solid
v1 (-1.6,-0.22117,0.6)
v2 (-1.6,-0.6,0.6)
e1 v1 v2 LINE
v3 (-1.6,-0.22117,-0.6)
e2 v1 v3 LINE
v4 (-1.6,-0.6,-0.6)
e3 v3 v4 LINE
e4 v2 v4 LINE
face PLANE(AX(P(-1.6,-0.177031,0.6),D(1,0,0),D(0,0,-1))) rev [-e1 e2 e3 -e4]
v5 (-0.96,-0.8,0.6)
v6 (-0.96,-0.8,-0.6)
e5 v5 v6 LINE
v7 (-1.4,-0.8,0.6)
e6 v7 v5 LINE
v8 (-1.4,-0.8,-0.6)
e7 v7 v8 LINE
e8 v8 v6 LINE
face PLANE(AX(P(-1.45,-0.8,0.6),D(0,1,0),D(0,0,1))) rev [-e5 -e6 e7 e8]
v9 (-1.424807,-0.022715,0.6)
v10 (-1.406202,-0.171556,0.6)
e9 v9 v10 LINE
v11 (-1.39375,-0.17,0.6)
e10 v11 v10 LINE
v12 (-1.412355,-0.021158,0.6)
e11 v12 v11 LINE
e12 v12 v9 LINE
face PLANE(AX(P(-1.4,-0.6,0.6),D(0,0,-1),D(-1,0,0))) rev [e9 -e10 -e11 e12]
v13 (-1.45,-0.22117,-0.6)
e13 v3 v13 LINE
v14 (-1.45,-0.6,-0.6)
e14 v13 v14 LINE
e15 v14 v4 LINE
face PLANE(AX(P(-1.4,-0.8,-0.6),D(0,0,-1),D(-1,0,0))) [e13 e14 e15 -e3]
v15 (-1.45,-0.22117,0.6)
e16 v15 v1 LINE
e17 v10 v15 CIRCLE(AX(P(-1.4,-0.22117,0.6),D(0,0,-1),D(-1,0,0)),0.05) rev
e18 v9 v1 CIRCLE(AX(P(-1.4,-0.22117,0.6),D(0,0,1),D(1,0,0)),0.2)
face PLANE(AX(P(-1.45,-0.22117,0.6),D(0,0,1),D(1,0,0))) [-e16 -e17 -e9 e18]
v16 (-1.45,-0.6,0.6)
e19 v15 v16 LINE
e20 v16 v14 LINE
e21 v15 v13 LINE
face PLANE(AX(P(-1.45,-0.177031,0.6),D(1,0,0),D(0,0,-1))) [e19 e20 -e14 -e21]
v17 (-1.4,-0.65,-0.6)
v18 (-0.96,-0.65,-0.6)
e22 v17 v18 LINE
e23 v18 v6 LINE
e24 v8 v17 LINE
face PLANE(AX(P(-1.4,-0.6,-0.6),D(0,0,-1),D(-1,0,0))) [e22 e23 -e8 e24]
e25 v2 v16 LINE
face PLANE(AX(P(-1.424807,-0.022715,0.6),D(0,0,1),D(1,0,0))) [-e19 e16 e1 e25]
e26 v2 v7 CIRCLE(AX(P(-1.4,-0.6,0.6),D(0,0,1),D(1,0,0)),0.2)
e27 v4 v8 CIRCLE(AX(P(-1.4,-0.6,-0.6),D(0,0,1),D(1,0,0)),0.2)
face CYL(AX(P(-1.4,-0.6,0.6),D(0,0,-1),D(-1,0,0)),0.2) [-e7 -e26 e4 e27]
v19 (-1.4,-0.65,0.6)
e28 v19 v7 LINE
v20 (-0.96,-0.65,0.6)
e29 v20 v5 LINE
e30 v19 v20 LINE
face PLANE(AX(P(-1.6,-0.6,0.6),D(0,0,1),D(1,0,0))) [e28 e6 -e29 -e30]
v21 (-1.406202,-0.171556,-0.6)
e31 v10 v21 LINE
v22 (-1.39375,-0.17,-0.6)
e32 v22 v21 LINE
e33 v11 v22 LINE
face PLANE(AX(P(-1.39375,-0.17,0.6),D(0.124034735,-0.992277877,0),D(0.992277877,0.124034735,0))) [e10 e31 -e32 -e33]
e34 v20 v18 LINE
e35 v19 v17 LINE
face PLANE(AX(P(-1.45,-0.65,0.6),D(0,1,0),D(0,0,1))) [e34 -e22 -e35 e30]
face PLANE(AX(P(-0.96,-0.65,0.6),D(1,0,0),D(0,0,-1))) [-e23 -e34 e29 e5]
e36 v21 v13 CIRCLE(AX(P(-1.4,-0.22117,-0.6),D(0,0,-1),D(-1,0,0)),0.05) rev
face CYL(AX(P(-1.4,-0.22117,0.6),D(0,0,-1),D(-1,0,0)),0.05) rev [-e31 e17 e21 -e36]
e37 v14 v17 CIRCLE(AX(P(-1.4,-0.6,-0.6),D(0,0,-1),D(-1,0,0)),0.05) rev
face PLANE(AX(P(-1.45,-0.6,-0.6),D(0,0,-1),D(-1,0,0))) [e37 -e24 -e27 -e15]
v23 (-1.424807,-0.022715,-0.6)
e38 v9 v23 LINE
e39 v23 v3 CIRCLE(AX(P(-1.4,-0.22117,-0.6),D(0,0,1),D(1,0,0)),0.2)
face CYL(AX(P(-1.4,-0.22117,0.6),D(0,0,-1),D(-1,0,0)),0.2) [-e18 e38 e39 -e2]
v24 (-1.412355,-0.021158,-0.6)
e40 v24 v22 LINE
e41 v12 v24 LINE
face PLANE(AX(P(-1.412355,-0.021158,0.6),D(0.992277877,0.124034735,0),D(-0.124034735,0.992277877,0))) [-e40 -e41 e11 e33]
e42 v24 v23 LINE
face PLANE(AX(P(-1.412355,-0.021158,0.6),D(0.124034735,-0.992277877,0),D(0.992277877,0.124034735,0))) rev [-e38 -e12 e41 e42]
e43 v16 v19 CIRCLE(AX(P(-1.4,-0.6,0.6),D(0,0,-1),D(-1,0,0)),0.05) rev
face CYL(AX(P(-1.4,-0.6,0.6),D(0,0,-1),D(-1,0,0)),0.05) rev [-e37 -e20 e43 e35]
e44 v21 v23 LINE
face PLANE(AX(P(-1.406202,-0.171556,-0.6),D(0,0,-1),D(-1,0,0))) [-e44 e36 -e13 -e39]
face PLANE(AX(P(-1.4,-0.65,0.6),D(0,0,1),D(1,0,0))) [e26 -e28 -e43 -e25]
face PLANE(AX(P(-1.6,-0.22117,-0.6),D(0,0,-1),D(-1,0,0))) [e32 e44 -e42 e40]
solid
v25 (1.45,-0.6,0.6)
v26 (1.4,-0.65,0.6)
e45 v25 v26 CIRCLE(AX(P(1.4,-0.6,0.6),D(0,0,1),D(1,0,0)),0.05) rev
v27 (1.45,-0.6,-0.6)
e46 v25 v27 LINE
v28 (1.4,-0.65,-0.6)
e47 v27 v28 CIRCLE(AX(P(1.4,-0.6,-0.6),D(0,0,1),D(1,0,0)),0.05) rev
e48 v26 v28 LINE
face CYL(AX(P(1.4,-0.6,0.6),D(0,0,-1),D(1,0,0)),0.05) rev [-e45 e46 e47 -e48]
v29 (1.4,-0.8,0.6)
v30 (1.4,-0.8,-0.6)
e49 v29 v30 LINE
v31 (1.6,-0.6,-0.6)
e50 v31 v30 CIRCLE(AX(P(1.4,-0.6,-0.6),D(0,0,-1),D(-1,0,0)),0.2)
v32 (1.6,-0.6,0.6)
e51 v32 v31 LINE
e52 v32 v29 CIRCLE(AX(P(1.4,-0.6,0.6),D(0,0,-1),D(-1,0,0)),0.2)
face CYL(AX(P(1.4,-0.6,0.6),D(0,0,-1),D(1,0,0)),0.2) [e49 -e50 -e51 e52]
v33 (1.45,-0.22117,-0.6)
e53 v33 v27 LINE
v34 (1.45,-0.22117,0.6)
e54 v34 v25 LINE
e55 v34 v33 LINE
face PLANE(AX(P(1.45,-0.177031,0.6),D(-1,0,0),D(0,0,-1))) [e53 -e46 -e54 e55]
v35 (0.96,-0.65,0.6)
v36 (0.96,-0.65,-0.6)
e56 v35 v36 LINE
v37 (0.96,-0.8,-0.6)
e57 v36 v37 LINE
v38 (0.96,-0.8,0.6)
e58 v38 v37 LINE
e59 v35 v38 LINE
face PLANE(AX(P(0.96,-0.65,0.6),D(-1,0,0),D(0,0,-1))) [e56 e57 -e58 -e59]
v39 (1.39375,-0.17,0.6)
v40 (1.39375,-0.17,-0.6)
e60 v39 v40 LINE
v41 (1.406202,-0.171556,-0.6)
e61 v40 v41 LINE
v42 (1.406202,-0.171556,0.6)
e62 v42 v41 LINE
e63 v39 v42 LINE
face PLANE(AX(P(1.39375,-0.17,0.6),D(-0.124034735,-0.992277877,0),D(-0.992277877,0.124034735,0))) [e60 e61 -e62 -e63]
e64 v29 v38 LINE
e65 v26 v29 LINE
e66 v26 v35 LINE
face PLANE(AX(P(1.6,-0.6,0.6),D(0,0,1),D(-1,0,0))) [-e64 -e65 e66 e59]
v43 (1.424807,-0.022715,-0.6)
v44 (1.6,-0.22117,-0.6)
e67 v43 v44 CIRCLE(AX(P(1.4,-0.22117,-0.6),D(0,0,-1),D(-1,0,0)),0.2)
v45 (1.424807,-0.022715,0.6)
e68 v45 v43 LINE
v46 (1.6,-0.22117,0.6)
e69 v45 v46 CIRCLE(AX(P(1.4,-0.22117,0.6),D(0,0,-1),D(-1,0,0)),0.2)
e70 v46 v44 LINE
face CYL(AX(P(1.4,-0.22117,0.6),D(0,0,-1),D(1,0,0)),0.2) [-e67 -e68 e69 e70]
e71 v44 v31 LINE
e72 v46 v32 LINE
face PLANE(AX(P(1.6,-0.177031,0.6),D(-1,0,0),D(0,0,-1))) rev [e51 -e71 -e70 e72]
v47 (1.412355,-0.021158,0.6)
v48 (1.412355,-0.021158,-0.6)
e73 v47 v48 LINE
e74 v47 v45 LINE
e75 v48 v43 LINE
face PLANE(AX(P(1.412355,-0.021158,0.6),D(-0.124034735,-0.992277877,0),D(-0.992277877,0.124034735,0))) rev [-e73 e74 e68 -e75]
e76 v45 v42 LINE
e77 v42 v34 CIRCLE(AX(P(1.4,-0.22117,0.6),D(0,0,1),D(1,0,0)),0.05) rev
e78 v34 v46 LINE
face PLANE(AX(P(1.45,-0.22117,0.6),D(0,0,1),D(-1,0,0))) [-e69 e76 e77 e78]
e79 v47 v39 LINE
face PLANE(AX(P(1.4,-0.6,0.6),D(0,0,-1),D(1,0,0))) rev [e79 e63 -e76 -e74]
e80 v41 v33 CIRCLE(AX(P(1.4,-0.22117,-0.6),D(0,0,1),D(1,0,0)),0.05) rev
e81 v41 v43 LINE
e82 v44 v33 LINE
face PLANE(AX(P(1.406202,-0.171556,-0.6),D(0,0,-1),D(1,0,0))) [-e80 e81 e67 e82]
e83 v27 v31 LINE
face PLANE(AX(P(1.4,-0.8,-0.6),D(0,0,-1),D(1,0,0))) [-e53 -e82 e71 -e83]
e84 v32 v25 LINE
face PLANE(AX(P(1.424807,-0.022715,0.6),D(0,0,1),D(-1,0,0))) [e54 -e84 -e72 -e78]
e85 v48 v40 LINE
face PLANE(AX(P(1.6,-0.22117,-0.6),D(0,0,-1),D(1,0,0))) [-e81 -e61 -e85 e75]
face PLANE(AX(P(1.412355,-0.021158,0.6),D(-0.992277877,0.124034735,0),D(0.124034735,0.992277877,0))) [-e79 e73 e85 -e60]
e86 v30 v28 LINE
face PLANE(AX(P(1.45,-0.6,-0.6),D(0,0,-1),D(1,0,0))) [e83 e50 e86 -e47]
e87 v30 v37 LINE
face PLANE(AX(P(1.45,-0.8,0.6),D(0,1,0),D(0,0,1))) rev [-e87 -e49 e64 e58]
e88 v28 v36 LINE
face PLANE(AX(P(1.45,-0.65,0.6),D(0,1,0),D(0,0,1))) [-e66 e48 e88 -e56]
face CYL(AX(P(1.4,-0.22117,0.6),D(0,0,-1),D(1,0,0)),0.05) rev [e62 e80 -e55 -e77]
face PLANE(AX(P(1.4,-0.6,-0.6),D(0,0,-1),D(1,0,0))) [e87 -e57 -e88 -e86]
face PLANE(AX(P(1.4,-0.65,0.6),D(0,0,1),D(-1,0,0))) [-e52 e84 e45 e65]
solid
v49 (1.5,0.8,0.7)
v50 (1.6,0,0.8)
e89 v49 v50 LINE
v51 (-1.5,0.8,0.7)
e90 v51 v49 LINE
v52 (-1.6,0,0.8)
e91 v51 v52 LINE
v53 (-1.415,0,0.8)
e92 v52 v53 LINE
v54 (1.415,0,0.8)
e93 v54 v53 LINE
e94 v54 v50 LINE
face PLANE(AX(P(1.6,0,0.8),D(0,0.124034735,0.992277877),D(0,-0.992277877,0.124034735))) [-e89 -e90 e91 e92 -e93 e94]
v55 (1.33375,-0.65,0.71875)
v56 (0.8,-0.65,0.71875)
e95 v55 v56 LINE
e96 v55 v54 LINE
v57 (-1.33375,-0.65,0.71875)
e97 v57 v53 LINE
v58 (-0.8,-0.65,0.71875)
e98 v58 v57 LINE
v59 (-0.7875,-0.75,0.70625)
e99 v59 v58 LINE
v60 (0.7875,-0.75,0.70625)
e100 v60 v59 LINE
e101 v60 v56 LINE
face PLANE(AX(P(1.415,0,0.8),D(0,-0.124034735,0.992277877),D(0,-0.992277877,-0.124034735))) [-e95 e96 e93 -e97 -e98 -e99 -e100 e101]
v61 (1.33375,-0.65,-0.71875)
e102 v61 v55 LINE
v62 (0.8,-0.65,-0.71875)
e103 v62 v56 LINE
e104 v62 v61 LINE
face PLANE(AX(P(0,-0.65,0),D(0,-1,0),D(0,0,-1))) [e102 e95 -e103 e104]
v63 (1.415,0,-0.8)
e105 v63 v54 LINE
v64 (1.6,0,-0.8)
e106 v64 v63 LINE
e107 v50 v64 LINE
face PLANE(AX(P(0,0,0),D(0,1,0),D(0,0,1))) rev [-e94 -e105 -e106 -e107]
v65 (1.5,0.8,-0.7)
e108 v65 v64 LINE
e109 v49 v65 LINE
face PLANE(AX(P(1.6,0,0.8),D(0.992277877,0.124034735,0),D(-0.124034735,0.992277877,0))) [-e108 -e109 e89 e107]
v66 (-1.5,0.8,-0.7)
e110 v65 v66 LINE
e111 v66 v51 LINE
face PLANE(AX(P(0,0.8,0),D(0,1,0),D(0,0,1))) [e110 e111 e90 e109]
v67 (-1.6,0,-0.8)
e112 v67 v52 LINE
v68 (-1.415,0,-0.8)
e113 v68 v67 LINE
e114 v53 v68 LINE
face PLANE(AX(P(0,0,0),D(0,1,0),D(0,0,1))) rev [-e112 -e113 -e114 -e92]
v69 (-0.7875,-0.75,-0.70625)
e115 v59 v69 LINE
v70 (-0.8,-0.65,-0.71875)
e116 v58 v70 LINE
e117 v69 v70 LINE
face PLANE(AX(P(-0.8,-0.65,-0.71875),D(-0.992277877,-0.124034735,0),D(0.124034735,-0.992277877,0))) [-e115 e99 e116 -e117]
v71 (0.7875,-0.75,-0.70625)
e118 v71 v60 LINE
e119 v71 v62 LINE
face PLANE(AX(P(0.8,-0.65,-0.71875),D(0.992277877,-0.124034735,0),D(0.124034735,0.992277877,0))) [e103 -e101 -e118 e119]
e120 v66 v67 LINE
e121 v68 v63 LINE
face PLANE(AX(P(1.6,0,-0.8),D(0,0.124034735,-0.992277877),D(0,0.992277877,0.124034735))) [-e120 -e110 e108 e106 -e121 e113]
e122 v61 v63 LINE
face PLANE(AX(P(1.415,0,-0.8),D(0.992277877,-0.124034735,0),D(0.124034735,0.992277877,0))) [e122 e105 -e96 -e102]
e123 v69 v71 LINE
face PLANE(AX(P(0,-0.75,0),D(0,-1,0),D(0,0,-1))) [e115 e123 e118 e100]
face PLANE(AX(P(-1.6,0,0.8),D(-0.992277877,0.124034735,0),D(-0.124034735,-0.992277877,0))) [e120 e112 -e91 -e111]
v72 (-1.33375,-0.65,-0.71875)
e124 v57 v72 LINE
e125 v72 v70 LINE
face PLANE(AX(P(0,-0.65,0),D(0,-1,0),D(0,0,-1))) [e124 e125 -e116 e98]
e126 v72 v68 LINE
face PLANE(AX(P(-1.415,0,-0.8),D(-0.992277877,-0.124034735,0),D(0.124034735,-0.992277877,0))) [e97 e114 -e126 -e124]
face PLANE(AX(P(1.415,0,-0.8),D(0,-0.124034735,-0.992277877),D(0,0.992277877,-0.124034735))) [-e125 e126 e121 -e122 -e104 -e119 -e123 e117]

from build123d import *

# Parameters (mm, degrees)
ESQUISSE1_W                    = 3.2
ESQUISSE1_H                    = 1.6
BOSS_EXTRU_1_DEPTH             = 0.8
BOSS_EXTRU_1_TAPER             = 7.125016349
ESQUISSE3_W                    = 2.83
ESQUISSE3_H                    = 1.6
BOSS_EXTRU_2_DEPTH             = 0.65
BOSS_EXTRU_2_TAPER             = 7.125016349
T_LE_DE_BASE_PLI_E1_DEPTH      = 0.6
T_LE_DE_BASE_PLI_E1_DEPTH_BACK = 0.6
ESQUISSE11_W                   = 1.6
ESQUISSE11_H                   = 1.4375
BOSS_EXTRU_3_DEPTH             = 0.1
BOSS_EXTRU_3_TAPER             = 7.125016349


# Sheet-metal steps are written as plain solids
with BuildPart() as part:
    # Esquisse1 → Boss.-Extru.1 (new body)
    with BuildSketch(Plane(origin=(0, 0, 0), x_dir=(1, 0, 0), z_dir=(0, 1, 0))):
        Rectangle(ESQUISSE1_W, ESQUISSE1_H)
    extrude(amount=BOSS_EXTRU_1_DEPTH, taper=BOSS_EXTRU_1_TAPER)

    # Esquisse3 → Boss.-Extru.2 (add)
    with BuildSketch(Plane.XZ):
        Rectangle(ESQUISSE3_W, ESQUISSE3_H)
    extrude(amount=BOSS_EXTRU_2_DEPTH, taper=BOSS_EXTRU_2_TAPER)

    # Esquisse11 → Boss.-Extru.3 (add)
    with BuildSketch(Plane.XZ.offset(0.65)):
        Rectangle(ESQUISSE11_W, ESQUISSE11_H)
    extrude(amount=BOSS_EXTRU_3_DEPTH, taper=BOSS_EXTRU_3_TAPER)


with BuildPart() as body_2:
    # Esquisse4 → Tôle de base pliée1 (new, two sides: drawn at the far end of the back side and taken through both)
    with BuildSketch(Plane.XY.offset(-T_LE_DE_BASE_PLI_E1_DEPTH_BACK)):
        with BuildLine():
            Line((-1.39375, -0.17), (-1.406201737, -0.171556467))
            ThreePointArc((-1.406201737, -0.171556467), (-1.437483909, -0.188080233), (-1.45, -0.221170361))
            Line((-1.45, -0.221170361), (-1.45, -0.6))
            ThreePointArc((-1.45, -0.6), (-1.435355339, -0.635355339), (-1.4, -0.65))
            Line((-1.4, -0.65), (-0.96, -0.65))
            Line((-0.96, -0.65), (-0.96, -0.8))
            Line((-0.96, -0.8), (-1.4, -0.8))
            ThreePointArc((-1.4, -0.8), (-1.541421356, -0.741421356), (-1.6, -0.6))
            Line((-1.6, -0.6), (-1.6, -0.221170361))
            ThreePointArc((-1.6, -0.221170361), (-1.549935635, -0.088809848), (-1.424806947, -0.022714786))
            Line((-1.424806947, -0.022714786), (-1.41235521, -0.021158318))
            Line((-1.41235521, -0.021158318), (-1.39375, -0.17))
        make_face()
    extrude(amount=T_LE_DE_BASE_PLI_E1_DEPTH + T_LE_DE_BASE_PLI_E1_DEPTH_BACK)


with BuildPart() as body_3:
    # Symétrie1: mirrored copy
    add(body_2.part.mirror(Plane(origin=(0, 0, 0), x_dir=(0, 0, 1), z_dir=(1, 0, 0))))


solid = Compound([part.part, body_2.part, body_3.part])
